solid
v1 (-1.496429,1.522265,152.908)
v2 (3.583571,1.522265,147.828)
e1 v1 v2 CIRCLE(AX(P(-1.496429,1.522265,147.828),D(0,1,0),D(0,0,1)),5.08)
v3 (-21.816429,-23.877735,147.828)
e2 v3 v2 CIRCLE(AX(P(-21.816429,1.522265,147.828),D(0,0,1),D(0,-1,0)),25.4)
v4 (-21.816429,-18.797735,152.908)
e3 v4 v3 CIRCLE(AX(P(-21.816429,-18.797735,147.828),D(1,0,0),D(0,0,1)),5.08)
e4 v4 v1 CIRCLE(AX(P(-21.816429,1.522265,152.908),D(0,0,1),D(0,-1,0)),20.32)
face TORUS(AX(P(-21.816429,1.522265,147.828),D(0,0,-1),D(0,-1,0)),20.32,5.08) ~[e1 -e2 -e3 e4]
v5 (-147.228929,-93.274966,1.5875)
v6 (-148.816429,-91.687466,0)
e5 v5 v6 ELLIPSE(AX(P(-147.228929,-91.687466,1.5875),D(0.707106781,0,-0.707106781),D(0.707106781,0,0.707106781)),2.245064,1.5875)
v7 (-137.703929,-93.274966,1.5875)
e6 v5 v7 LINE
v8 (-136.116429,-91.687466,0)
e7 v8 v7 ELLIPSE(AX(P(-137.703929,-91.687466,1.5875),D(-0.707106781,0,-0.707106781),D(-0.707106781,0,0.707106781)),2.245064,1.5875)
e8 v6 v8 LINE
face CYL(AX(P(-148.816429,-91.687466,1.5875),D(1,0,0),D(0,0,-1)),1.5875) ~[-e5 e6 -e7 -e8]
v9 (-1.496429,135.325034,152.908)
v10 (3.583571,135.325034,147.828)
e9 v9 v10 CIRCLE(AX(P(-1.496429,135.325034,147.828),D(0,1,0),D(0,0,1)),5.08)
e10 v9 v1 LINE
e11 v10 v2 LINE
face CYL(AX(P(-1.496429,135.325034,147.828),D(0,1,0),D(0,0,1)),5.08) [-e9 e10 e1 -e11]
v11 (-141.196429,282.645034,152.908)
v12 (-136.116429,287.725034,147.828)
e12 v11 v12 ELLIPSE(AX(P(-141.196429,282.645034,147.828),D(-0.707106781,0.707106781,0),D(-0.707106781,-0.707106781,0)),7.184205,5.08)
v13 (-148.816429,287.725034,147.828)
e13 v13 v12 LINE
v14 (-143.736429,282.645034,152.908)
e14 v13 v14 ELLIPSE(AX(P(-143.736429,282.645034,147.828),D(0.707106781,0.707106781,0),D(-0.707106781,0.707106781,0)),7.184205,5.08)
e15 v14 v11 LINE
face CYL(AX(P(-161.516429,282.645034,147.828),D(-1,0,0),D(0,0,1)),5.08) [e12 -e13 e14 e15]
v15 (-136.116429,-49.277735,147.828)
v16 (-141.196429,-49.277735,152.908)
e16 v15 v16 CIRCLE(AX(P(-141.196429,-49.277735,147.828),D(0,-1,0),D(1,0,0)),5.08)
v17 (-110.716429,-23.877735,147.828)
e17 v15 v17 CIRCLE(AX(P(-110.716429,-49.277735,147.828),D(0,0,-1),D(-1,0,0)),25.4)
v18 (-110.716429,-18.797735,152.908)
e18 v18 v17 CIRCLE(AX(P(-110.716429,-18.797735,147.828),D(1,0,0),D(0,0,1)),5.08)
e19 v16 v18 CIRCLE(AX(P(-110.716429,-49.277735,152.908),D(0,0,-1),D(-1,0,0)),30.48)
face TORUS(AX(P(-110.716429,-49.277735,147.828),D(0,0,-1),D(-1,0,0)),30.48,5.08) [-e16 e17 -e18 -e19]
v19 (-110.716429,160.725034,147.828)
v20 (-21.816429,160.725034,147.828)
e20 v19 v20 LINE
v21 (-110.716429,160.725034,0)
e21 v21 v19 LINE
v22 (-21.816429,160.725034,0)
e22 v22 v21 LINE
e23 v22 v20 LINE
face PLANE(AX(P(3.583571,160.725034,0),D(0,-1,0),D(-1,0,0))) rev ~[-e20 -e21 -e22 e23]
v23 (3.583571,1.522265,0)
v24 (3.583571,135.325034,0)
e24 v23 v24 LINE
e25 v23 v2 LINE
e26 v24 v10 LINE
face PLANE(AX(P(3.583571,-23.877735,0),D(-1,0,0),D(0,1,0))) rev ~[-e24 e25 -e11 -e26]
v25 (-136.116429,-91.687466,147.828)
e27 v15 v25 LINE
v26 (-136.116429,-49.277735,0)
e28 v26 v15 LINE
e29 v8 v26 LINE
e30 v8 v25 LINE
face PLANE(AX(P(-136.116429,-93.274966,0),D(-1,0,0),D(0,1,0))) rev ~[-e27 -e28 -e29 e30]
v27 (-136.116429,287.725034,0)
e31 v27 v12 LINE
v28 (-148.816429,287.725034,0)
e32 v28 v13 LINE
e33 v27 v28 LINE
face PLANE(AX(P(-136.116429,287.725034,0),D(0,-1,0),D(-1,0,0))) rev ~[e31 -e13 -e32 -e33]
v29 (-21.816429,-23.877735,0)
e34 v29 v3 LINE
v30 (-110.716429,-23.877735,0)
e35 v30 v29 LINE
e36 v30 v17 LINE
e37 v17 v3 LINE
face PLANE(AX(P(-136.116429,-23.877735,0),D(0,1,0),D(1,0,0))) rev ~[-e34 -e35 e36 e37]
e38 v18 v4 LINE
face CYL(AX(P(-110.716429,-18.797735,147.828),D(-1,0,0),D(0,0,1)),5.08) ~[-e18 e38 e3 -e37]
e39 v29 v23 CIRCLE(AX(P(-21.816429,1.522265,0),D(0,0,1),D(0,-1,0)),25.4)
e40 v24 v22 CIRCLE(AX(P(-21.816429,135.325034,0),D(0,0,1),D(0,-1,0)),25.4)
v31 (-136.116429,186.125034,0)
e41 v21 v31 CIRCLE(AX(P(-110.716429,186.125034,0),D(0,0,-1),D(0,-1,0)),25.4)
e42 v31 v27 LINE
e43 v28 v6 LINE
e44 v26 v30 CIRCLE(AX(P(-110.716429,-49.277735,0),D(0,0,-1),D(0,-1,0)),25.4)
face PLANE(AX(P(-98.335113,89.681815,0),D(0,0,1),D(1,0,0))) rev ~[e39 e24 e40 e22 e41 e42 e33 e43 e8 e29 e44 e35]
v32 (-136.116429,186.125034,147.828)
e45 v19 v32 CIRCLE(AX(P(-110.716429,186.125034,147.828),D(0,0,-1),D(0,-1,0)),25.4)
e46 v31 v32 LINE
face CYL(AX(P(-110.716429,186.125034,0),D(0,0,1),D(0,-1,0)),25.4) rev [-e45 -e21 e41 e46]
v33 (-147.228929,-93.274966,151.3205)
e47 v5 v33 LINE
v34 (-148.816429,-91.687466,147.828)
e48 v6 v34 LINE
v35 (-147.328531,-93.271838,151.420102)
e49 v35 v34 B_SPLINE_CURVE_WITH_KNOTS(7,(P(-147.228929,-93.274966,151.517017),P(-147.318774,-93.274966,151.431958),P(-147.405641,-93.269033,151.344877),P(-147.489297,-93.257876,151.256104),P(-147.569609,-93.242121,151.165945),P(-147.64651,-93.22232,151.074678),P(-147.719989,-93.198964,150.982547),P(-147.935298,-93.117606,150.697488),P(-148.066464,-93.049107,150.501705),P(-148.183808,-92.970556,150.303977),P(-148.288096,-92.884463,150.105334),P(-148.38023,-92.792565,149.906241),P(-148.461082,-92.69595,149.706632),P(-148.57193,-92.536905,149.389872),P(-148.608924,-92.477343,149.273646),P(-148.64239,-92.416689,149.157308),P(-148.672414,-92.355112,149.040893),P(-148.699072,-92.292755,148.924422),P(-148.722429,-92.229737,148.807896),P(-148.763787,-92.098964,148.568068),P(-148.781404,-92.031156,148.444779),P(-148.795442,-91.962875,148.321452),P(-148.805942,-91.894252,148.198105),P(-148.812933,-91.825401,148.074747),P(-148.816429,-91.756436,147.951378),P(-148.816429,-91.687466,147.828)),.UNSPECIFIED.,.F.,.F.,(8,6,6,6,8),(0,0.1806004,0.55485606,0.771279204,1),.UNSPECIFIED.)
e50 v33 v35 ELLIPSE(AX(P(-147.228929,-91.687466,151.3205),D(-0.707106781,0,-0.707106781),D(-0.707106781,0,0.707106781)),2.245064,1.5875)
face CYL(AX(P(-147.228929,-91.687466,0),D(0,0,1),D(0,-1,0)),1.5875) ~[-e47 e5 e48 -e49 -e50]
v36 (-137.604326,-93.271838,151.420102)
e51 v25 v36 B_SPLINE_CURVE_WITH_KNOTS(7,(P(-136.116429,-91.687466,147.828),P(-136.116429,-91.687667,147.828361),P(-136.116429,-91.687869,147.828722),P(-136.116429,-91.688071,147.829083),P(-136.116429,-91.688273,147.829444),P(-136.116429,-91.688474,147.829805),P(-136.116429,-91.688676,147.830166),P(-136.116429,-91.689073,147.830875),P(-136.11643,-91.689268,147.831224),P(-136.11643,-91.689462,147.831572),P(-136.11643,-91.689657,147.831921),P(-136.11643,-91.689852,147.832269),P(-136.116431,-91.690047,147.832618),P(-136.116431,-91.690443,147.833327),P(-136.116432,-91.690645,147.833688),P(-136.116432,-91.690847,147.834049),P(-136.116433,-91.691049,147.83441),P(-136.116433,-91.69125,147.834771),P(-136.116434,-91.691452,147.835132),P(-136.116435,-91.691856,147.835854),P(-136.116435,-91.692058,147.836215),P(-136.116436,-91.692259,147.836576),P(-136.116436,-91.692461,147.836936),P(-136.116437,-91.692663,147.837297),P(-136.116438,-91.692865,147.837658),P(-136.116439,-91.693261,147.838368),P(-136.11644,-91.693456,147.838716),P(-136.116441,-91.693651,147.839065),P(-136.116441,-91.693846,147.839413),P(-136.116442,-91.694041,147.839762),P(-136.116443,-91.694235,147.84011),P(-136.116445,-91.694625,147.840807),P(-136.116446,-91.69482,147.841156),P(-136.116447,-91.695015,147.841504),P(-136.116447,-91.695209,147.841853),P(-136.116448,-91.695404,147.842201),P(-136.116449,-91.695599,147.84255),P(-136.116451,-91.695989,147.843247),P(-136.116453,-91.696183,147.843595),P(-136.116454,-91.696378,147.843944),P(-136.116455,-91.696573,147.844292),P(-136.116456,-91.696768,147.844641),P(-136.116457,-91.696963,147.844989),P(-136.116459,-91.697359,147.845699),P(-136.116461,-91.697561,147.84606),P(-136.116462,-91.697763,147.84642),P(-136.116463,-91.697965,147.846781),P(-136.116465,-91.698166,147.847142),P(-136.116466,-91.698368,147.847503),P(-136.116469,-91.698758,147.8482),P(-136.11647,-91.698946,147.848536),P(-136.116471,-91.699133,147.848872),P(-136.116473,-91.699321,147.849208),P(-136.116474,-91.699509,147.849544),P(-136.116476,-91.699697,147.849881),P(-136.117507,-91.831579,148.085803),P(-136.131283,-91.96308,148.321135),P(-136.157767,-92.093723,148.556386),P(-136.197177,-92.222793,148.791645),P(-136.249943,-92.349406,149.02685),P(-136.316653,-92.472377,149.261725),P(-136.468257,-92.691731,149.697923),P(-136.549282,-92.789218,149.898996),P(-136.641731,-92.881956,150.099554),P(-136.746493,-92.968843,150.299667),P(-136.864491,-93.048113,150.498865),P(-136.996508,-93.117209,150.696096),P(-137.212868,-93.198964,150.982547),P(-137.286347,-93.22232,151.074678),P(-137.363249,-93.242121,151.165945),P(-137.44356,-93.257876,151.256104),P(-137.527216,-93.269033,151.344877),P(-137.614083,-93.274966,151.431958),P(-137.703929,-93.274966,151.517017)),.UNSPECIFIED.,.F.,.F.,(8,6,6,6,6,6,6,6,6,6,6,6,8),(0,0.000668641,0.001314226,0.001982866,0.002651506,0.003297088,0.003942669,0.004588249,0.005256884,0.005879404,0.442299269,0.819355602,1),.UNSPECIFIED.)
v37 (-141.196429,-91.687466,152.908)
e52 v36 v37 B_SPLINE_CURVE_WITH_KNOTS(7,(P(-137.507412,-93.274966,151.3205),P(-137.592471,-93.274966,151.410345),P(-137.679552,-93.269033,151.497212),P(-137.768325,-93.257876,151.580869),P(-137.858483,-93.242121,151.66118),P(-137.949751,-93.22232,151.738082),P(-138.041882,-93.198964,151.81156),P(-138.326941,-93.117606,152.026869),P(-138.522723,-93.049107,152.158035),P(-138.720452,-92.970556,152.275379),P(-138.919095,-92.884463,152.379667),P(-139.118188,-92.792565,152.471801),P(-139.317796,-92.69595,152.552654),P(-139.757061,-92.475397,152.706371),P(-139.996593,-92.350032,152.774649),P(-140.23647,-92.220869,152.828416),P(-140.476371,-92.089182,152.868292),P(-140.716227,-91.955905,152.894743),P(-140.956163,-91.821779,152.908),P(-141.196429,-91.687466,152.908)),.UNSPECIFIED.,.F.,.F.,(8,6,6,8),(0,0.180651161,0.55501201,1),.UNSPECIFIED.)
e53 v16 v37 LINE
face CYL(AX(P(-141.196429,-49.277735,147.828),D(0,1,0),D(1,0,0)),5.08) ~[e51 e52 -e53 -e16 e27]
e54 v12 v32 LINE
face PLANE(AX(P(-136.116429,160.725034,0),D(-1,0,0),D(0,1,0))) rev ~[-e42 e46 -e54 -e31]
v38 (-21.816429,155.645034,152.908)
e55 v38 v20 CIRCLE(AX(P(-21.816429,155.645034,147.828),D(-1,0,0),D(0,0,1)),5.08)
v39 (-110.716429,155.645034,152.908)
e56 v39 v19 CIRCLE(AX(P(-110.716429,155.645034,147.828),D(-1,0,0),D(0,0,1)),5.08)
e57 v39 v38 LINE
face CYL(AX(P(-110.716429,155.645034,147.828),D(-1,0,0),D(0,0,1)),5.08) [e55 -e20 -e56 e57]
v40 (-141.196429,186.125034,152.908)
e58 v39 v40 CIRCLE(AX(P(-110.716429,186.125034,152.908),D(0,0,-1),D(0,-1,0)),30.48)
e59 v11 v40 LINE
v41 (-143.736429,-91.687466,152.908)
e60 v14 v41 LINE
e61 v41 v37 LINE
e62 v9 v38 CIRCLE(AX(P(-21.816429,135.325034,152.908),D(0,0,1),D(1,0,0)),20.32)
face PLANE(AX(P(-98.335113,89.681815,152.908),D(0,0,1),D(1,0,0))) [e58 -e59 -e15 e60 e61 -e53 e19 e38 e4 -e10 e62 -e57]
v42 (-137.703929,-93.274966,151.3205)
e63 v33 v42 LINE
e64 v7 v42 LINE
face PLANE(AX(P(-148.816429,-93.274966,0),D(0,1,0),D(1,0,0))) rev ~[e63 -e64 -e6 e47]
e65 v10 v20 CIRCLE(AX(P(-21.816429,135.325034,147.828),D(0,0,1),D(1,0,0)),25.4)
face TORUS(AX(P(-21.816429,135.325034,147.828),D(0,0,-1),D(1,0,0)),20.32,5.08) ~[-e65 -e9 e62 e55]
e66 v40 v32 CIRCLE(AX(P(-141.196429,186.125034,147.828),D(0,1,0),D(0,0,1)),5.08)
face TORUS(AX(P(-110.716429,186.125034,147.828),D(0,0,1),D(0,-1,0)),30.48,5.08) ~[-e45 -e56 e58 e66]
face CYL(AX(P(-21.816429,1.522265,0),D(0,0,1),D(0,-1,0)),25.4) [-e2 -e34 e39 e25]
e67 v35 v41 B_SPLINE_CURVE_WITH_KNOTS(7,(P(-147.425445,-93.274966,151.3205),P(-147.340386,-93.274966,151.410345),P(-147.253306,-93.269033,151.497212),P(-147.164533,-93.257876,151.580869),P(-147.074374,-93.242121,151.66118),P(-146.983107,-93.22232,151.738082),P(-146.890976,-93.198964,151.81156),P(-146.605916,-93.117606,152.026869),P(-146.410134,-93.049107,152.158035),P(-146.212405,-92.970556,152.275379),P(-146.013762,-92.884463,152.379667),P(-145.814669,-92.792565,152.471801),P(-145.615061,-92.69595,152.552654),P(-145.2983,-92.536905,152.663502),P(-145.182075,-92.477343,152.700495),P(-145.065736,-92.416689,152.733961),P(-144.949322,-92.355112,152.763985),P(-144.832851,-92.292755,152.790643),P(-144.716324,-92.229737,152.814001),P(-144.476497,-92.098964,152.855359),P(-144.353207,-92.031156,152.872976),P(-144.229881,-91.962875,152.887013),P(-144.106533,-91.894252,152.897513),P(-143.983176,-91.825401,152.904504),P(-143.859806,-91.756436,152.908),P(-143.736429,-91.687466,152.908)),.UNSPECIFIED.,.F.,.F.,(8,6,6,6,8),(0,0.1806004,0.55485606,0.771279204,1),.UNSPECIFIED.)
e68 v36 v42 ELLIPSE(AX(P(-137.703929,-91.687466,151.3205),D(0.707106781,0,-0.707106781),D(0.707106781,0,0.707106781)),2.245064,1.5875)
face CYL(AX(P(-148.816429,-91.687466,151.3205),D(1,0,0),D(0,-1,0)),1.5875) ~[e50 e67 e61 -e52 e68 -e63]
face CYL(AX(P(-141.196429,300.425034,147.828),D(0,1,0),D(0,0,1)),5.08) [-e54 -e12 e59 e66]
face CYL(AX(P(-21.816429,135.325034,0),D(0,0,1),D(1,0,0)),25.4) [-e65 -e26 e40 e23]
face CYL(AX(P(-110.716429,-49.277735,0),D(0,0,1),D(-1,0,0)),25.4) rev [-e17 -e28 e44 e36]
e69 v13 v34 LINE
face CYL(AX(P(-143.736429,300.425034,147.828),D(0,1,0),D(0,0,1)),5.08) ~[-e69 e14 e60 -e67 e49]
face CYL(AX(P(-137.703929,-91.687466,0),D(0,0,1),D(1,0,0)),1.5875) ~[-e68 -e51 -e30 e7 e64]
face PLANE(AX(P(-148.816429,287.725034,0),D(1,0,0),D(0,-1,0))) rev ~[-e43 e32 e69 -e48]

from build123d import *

# Parameters (mm, degrees)
F1_DEPTH     = 152.908
F2_R         = 25.4
F3_R         = 1.5875
F4_T1_DEPTH  = 55.1097300731
F4_T3_DEPTH  = 404.8125
F4_T5_DEPTH  = 88.9
F4_T7_DEPTH  = 38.1
F4_T9_DEPTH  = 114.3
F4_T11_DEPTH = 133.8027699269
F4_T14_ANGLE = 90
F4_T16_ANGLE = 90
F4_T18_ANGLE = 90
F4_T20_ANGLE = 90


# Not quite as in the source:
# - a fillet or chamfer that OpenCascade refuses, or shapes differently, is made with other operations: its cross-section is extruded or revolved along the edge and cut away or added


with BuildPart() as f1:
    # F0 (on Top) → F1 (new body)
    with BuildSketch(Plane.XY):
        Polygon((-148.8164286077, -93.2749655156), (-136.1164286077, -93.2749655156), (-136.1164286077, -23.8777354426), (3.5835713923, -23.8777354426), (3.5835713923, 160.7250344844), (-136.1164286077, 160.7250344844), (-136.1164286077, 287.7250344844), (-148.8164286077, 287.7250344844), align=None)
    extrude(amount=F1_DEPTH)

    # F2
    f2_edges = [f1.edges().sort_by_distance(p)[0] for p in [
        (-136.116429, -23.877735, 76.454),
        (3.583571, -23.877735, 76.454),
        (3.583571, 160.725034, 76.454),
        (-136.116429, 160.725034, 76.454),
    ]]
    fillet(f2_edges, radius=F2_R)

    # F3
    f3_edges = [f1.edges().sort_by_distance(p)[0] for p in [
        (-148.816429, -93.274966, 76.454),
        (-136.116429, -93.274966, 76.454),
        (-142.466429, -93.274966, 0),
        (-142.466429, -93.274966, 152.908),
    ]]
    fillet(f3_edges, radius=F3_R)

    # F4: fillet of radius 5.08 on 12 edges, made by hand

    # F4_s2 → F4_t1 (cut)
    with BuildSketch(Plane.XZ.offset(49.2777354426)):
        with BuildLine():
            ThreePointArc((-136.1164286077, 147.828), (-137.6043261593, 151.4201024484), (-141.1964286077, 152.908))
            Line((-141.1964286077, 152.908), (-136.1164286077, 152.908))
            Line((-136.1164286077, 152.908), (-136.1164286077, 147.828))
        make_face()
    extrude(amount=F4_T1_DEPTH, mode=Mode.SUBTRACT)

    # F4_s4 → F4_t3 (cut)
    with BuildSketch(Plane.XZ.offset(-300.4250344844)):
        with BuildLine():
            ThreePointArc((-143.7364286077, 152.908), (-147.3285310561, 151.4201024484), (-148.8164286077, 147.828))
            Line((-148.8164286077, 147.828), (-148.8164286077, 152.908))
            Line((-148.8164286077, 152.908), (-143.7364286077, 152.908))
        make_face()
    extrude(amount=F4_T3_DEPTH, mode=Mode.SUBTRACT)

    # F4_s6 → F4_t5 (cut)
    with BuildSketch(Plane.YZ.offset(-110.7164286077)):
        with BuildLine():
            ThreePointArc((-18.7977354426, 152.908), (-22.389837891, 151.4201024484), (-23.8777354426, 147.828))
            Line((-23.8777354426, 147.828), (-23.8777354426, 152.908))
            Line((-23.8777354426, 152.908), (-18.7977354426, 152.908))
        make_face()
        with BuildLine():
            ThreePointArc((155.6450344844, 152.908), (159.2371369328, 151.4201024484), (160.7250344844, 147.828))
            Line((160.7250344844, 147.828), (160.7250344844, 152.908))
            Line((160.7250344844, 152.908), (155.6450344844, 152.908))
        make_face()
    extrude(amount=F4_T5_DEPTH, mode=Mode.SUBTRACT)

    # F4_s8 → F4_t7 (cut)
    with BuildSketch(Plane.YZ.offset(-161.5164286077)):
        with BuildLine():
            ThreePointArc((282.6450344844, 152.908), (286.2371369328, 151.4201024484), (287.7250344844, 147.828))
            Line((287.7250344844, 147.828), (287.7250344844, 152.908))
            Line((287.7250344844, 152.908), (282.6450344844, 152.908))
        make_face()
    extrude(amount=F4_T7_DEPTH, mode=Mode.SUBTRACT)

    # F4_s10 → F4_t9 (cut)
    with BuildSketch(Plane.XZ.offset(-300.4250344844)):
        with BuildLine():
            ThreePointArc((-141.1964286077, 152.908), (-137.6043261593, 151.4201024484), (-136.1164286077, 147.828))
            Line((-136.1164286077, 147.828), (-136.1164286077, 152.908))
            Line((-136.1164286077, 152.908), (-141.1964286077, 152.908))
        make_face()
    extrude(amount=F4_T9_DEPTH, mode=Mode.SUBTRACT)

    # F4_s12 → F4_t11 (cut)
    with BuildSketch(Plane.XZ.offset(-135.3250344844)):
        with BuildLine():
            ThreePointArc((-1.4964286077, 152.908), (2.0956738407, 151.4201024484), (3.5835713923, 147.828))
            Line((3.5835713923, 147.828), (3.5835713923, 152.908))
            Line((3.5835713923, 152.908), (-1.4964286077, 152.908))
        make_face()
    extrude(amount=F4_T11_DEPTH, mode=Mode.SUBTRACT)

    # F4_s13 → F4_t14 (revolve, cut)
    with BuildSketch(Plane.XZ.offset(49.2777354426)):
        with BuildLine():
            ThreePointArc((-136.1164286077, 147.828), (-137.6043261593, 151.4201024484), (-141.1964286077, 152.908))
            Line((-141.1964286077, 152.908), (-136.1164286077, 152.908))
            Line((-136.1164286077, 152.908), (-136.1164286077, 147.828))
        make_face()
    revolve(axis=Axis((-110.7164286077, -49.2777354426, 152.908), (0, 0, -1)), revolution_arc=F4_T14_ANGLE, mode=Mode.SUBTRACT)

    # F4_s15 → F4_t16 (revolve, cut)
    with BuildSketch(Plane.YZ.offset(-21.8164286077)):
        with BuildLine():
            ThreePointArc((-18.7977354426, 152.908), (-22.389837891, 151.4201024484), (-23.8777354426, 147.828))
            Line((-23.8777354426, 147.828), (-23.8777354426, 152.908))
            Line((-23.8777354426, 152.908), (-18.7977354426, 152.908))
        make_face()
    revolve(axis=Axis((-21.8164286077, 1.5222645574, 152.908), (0, 0, 1)), revolution_arc=F4_T16_ANGLE, mode=Mode.SUBTRACT)

    # F4_s17 → F4_t18 (revolve, cut)
    with BuildSketch(Plane.YZ.offset(-110.7164286077)):
        with BuildLine():
            ThreePointArc((155.6450344844, 152.908), (159.2371369328, 151.4201024484), (160.7250344844, 147.828))
            Line((160.7250344844, 147.828), (160.7250344844, 152.908))
            Line((160.7250344844, 152.908), (155.6450344844, 152.908))
        make_face()
    revolve(axis=Axis((-110.7164286077, 186.1250344844, 152.908), (0, 0, -1)), revolution_arc=F4_T18_ANGLE, mode=Mode.SUBTRACT)

    # F4_s19 → F4_t20 (revolve, cut)
    with BuildSketch(Plane.XZ.offset(-135.3250344844)):
        with BuildLine():
            ThreePointArc((-1.4964286077, 152.908), (2.0956738407, 151.4201024484), (3.5835713923, 147.828))
            Line((3.5835713923, 147.828), (3.5835713923, 152.908))
            Line((3.5835713923, 152.908), (-1.4964286077, 152.908))
        make_face()
    revolve(axis=Axis((-21.8164286077, 135.3250344844, 152.908), (0, 0, 1)), revolution_arc=F4_T20_ANGLE, mode=Mode.SUBTRACT)


solid = f1.part
